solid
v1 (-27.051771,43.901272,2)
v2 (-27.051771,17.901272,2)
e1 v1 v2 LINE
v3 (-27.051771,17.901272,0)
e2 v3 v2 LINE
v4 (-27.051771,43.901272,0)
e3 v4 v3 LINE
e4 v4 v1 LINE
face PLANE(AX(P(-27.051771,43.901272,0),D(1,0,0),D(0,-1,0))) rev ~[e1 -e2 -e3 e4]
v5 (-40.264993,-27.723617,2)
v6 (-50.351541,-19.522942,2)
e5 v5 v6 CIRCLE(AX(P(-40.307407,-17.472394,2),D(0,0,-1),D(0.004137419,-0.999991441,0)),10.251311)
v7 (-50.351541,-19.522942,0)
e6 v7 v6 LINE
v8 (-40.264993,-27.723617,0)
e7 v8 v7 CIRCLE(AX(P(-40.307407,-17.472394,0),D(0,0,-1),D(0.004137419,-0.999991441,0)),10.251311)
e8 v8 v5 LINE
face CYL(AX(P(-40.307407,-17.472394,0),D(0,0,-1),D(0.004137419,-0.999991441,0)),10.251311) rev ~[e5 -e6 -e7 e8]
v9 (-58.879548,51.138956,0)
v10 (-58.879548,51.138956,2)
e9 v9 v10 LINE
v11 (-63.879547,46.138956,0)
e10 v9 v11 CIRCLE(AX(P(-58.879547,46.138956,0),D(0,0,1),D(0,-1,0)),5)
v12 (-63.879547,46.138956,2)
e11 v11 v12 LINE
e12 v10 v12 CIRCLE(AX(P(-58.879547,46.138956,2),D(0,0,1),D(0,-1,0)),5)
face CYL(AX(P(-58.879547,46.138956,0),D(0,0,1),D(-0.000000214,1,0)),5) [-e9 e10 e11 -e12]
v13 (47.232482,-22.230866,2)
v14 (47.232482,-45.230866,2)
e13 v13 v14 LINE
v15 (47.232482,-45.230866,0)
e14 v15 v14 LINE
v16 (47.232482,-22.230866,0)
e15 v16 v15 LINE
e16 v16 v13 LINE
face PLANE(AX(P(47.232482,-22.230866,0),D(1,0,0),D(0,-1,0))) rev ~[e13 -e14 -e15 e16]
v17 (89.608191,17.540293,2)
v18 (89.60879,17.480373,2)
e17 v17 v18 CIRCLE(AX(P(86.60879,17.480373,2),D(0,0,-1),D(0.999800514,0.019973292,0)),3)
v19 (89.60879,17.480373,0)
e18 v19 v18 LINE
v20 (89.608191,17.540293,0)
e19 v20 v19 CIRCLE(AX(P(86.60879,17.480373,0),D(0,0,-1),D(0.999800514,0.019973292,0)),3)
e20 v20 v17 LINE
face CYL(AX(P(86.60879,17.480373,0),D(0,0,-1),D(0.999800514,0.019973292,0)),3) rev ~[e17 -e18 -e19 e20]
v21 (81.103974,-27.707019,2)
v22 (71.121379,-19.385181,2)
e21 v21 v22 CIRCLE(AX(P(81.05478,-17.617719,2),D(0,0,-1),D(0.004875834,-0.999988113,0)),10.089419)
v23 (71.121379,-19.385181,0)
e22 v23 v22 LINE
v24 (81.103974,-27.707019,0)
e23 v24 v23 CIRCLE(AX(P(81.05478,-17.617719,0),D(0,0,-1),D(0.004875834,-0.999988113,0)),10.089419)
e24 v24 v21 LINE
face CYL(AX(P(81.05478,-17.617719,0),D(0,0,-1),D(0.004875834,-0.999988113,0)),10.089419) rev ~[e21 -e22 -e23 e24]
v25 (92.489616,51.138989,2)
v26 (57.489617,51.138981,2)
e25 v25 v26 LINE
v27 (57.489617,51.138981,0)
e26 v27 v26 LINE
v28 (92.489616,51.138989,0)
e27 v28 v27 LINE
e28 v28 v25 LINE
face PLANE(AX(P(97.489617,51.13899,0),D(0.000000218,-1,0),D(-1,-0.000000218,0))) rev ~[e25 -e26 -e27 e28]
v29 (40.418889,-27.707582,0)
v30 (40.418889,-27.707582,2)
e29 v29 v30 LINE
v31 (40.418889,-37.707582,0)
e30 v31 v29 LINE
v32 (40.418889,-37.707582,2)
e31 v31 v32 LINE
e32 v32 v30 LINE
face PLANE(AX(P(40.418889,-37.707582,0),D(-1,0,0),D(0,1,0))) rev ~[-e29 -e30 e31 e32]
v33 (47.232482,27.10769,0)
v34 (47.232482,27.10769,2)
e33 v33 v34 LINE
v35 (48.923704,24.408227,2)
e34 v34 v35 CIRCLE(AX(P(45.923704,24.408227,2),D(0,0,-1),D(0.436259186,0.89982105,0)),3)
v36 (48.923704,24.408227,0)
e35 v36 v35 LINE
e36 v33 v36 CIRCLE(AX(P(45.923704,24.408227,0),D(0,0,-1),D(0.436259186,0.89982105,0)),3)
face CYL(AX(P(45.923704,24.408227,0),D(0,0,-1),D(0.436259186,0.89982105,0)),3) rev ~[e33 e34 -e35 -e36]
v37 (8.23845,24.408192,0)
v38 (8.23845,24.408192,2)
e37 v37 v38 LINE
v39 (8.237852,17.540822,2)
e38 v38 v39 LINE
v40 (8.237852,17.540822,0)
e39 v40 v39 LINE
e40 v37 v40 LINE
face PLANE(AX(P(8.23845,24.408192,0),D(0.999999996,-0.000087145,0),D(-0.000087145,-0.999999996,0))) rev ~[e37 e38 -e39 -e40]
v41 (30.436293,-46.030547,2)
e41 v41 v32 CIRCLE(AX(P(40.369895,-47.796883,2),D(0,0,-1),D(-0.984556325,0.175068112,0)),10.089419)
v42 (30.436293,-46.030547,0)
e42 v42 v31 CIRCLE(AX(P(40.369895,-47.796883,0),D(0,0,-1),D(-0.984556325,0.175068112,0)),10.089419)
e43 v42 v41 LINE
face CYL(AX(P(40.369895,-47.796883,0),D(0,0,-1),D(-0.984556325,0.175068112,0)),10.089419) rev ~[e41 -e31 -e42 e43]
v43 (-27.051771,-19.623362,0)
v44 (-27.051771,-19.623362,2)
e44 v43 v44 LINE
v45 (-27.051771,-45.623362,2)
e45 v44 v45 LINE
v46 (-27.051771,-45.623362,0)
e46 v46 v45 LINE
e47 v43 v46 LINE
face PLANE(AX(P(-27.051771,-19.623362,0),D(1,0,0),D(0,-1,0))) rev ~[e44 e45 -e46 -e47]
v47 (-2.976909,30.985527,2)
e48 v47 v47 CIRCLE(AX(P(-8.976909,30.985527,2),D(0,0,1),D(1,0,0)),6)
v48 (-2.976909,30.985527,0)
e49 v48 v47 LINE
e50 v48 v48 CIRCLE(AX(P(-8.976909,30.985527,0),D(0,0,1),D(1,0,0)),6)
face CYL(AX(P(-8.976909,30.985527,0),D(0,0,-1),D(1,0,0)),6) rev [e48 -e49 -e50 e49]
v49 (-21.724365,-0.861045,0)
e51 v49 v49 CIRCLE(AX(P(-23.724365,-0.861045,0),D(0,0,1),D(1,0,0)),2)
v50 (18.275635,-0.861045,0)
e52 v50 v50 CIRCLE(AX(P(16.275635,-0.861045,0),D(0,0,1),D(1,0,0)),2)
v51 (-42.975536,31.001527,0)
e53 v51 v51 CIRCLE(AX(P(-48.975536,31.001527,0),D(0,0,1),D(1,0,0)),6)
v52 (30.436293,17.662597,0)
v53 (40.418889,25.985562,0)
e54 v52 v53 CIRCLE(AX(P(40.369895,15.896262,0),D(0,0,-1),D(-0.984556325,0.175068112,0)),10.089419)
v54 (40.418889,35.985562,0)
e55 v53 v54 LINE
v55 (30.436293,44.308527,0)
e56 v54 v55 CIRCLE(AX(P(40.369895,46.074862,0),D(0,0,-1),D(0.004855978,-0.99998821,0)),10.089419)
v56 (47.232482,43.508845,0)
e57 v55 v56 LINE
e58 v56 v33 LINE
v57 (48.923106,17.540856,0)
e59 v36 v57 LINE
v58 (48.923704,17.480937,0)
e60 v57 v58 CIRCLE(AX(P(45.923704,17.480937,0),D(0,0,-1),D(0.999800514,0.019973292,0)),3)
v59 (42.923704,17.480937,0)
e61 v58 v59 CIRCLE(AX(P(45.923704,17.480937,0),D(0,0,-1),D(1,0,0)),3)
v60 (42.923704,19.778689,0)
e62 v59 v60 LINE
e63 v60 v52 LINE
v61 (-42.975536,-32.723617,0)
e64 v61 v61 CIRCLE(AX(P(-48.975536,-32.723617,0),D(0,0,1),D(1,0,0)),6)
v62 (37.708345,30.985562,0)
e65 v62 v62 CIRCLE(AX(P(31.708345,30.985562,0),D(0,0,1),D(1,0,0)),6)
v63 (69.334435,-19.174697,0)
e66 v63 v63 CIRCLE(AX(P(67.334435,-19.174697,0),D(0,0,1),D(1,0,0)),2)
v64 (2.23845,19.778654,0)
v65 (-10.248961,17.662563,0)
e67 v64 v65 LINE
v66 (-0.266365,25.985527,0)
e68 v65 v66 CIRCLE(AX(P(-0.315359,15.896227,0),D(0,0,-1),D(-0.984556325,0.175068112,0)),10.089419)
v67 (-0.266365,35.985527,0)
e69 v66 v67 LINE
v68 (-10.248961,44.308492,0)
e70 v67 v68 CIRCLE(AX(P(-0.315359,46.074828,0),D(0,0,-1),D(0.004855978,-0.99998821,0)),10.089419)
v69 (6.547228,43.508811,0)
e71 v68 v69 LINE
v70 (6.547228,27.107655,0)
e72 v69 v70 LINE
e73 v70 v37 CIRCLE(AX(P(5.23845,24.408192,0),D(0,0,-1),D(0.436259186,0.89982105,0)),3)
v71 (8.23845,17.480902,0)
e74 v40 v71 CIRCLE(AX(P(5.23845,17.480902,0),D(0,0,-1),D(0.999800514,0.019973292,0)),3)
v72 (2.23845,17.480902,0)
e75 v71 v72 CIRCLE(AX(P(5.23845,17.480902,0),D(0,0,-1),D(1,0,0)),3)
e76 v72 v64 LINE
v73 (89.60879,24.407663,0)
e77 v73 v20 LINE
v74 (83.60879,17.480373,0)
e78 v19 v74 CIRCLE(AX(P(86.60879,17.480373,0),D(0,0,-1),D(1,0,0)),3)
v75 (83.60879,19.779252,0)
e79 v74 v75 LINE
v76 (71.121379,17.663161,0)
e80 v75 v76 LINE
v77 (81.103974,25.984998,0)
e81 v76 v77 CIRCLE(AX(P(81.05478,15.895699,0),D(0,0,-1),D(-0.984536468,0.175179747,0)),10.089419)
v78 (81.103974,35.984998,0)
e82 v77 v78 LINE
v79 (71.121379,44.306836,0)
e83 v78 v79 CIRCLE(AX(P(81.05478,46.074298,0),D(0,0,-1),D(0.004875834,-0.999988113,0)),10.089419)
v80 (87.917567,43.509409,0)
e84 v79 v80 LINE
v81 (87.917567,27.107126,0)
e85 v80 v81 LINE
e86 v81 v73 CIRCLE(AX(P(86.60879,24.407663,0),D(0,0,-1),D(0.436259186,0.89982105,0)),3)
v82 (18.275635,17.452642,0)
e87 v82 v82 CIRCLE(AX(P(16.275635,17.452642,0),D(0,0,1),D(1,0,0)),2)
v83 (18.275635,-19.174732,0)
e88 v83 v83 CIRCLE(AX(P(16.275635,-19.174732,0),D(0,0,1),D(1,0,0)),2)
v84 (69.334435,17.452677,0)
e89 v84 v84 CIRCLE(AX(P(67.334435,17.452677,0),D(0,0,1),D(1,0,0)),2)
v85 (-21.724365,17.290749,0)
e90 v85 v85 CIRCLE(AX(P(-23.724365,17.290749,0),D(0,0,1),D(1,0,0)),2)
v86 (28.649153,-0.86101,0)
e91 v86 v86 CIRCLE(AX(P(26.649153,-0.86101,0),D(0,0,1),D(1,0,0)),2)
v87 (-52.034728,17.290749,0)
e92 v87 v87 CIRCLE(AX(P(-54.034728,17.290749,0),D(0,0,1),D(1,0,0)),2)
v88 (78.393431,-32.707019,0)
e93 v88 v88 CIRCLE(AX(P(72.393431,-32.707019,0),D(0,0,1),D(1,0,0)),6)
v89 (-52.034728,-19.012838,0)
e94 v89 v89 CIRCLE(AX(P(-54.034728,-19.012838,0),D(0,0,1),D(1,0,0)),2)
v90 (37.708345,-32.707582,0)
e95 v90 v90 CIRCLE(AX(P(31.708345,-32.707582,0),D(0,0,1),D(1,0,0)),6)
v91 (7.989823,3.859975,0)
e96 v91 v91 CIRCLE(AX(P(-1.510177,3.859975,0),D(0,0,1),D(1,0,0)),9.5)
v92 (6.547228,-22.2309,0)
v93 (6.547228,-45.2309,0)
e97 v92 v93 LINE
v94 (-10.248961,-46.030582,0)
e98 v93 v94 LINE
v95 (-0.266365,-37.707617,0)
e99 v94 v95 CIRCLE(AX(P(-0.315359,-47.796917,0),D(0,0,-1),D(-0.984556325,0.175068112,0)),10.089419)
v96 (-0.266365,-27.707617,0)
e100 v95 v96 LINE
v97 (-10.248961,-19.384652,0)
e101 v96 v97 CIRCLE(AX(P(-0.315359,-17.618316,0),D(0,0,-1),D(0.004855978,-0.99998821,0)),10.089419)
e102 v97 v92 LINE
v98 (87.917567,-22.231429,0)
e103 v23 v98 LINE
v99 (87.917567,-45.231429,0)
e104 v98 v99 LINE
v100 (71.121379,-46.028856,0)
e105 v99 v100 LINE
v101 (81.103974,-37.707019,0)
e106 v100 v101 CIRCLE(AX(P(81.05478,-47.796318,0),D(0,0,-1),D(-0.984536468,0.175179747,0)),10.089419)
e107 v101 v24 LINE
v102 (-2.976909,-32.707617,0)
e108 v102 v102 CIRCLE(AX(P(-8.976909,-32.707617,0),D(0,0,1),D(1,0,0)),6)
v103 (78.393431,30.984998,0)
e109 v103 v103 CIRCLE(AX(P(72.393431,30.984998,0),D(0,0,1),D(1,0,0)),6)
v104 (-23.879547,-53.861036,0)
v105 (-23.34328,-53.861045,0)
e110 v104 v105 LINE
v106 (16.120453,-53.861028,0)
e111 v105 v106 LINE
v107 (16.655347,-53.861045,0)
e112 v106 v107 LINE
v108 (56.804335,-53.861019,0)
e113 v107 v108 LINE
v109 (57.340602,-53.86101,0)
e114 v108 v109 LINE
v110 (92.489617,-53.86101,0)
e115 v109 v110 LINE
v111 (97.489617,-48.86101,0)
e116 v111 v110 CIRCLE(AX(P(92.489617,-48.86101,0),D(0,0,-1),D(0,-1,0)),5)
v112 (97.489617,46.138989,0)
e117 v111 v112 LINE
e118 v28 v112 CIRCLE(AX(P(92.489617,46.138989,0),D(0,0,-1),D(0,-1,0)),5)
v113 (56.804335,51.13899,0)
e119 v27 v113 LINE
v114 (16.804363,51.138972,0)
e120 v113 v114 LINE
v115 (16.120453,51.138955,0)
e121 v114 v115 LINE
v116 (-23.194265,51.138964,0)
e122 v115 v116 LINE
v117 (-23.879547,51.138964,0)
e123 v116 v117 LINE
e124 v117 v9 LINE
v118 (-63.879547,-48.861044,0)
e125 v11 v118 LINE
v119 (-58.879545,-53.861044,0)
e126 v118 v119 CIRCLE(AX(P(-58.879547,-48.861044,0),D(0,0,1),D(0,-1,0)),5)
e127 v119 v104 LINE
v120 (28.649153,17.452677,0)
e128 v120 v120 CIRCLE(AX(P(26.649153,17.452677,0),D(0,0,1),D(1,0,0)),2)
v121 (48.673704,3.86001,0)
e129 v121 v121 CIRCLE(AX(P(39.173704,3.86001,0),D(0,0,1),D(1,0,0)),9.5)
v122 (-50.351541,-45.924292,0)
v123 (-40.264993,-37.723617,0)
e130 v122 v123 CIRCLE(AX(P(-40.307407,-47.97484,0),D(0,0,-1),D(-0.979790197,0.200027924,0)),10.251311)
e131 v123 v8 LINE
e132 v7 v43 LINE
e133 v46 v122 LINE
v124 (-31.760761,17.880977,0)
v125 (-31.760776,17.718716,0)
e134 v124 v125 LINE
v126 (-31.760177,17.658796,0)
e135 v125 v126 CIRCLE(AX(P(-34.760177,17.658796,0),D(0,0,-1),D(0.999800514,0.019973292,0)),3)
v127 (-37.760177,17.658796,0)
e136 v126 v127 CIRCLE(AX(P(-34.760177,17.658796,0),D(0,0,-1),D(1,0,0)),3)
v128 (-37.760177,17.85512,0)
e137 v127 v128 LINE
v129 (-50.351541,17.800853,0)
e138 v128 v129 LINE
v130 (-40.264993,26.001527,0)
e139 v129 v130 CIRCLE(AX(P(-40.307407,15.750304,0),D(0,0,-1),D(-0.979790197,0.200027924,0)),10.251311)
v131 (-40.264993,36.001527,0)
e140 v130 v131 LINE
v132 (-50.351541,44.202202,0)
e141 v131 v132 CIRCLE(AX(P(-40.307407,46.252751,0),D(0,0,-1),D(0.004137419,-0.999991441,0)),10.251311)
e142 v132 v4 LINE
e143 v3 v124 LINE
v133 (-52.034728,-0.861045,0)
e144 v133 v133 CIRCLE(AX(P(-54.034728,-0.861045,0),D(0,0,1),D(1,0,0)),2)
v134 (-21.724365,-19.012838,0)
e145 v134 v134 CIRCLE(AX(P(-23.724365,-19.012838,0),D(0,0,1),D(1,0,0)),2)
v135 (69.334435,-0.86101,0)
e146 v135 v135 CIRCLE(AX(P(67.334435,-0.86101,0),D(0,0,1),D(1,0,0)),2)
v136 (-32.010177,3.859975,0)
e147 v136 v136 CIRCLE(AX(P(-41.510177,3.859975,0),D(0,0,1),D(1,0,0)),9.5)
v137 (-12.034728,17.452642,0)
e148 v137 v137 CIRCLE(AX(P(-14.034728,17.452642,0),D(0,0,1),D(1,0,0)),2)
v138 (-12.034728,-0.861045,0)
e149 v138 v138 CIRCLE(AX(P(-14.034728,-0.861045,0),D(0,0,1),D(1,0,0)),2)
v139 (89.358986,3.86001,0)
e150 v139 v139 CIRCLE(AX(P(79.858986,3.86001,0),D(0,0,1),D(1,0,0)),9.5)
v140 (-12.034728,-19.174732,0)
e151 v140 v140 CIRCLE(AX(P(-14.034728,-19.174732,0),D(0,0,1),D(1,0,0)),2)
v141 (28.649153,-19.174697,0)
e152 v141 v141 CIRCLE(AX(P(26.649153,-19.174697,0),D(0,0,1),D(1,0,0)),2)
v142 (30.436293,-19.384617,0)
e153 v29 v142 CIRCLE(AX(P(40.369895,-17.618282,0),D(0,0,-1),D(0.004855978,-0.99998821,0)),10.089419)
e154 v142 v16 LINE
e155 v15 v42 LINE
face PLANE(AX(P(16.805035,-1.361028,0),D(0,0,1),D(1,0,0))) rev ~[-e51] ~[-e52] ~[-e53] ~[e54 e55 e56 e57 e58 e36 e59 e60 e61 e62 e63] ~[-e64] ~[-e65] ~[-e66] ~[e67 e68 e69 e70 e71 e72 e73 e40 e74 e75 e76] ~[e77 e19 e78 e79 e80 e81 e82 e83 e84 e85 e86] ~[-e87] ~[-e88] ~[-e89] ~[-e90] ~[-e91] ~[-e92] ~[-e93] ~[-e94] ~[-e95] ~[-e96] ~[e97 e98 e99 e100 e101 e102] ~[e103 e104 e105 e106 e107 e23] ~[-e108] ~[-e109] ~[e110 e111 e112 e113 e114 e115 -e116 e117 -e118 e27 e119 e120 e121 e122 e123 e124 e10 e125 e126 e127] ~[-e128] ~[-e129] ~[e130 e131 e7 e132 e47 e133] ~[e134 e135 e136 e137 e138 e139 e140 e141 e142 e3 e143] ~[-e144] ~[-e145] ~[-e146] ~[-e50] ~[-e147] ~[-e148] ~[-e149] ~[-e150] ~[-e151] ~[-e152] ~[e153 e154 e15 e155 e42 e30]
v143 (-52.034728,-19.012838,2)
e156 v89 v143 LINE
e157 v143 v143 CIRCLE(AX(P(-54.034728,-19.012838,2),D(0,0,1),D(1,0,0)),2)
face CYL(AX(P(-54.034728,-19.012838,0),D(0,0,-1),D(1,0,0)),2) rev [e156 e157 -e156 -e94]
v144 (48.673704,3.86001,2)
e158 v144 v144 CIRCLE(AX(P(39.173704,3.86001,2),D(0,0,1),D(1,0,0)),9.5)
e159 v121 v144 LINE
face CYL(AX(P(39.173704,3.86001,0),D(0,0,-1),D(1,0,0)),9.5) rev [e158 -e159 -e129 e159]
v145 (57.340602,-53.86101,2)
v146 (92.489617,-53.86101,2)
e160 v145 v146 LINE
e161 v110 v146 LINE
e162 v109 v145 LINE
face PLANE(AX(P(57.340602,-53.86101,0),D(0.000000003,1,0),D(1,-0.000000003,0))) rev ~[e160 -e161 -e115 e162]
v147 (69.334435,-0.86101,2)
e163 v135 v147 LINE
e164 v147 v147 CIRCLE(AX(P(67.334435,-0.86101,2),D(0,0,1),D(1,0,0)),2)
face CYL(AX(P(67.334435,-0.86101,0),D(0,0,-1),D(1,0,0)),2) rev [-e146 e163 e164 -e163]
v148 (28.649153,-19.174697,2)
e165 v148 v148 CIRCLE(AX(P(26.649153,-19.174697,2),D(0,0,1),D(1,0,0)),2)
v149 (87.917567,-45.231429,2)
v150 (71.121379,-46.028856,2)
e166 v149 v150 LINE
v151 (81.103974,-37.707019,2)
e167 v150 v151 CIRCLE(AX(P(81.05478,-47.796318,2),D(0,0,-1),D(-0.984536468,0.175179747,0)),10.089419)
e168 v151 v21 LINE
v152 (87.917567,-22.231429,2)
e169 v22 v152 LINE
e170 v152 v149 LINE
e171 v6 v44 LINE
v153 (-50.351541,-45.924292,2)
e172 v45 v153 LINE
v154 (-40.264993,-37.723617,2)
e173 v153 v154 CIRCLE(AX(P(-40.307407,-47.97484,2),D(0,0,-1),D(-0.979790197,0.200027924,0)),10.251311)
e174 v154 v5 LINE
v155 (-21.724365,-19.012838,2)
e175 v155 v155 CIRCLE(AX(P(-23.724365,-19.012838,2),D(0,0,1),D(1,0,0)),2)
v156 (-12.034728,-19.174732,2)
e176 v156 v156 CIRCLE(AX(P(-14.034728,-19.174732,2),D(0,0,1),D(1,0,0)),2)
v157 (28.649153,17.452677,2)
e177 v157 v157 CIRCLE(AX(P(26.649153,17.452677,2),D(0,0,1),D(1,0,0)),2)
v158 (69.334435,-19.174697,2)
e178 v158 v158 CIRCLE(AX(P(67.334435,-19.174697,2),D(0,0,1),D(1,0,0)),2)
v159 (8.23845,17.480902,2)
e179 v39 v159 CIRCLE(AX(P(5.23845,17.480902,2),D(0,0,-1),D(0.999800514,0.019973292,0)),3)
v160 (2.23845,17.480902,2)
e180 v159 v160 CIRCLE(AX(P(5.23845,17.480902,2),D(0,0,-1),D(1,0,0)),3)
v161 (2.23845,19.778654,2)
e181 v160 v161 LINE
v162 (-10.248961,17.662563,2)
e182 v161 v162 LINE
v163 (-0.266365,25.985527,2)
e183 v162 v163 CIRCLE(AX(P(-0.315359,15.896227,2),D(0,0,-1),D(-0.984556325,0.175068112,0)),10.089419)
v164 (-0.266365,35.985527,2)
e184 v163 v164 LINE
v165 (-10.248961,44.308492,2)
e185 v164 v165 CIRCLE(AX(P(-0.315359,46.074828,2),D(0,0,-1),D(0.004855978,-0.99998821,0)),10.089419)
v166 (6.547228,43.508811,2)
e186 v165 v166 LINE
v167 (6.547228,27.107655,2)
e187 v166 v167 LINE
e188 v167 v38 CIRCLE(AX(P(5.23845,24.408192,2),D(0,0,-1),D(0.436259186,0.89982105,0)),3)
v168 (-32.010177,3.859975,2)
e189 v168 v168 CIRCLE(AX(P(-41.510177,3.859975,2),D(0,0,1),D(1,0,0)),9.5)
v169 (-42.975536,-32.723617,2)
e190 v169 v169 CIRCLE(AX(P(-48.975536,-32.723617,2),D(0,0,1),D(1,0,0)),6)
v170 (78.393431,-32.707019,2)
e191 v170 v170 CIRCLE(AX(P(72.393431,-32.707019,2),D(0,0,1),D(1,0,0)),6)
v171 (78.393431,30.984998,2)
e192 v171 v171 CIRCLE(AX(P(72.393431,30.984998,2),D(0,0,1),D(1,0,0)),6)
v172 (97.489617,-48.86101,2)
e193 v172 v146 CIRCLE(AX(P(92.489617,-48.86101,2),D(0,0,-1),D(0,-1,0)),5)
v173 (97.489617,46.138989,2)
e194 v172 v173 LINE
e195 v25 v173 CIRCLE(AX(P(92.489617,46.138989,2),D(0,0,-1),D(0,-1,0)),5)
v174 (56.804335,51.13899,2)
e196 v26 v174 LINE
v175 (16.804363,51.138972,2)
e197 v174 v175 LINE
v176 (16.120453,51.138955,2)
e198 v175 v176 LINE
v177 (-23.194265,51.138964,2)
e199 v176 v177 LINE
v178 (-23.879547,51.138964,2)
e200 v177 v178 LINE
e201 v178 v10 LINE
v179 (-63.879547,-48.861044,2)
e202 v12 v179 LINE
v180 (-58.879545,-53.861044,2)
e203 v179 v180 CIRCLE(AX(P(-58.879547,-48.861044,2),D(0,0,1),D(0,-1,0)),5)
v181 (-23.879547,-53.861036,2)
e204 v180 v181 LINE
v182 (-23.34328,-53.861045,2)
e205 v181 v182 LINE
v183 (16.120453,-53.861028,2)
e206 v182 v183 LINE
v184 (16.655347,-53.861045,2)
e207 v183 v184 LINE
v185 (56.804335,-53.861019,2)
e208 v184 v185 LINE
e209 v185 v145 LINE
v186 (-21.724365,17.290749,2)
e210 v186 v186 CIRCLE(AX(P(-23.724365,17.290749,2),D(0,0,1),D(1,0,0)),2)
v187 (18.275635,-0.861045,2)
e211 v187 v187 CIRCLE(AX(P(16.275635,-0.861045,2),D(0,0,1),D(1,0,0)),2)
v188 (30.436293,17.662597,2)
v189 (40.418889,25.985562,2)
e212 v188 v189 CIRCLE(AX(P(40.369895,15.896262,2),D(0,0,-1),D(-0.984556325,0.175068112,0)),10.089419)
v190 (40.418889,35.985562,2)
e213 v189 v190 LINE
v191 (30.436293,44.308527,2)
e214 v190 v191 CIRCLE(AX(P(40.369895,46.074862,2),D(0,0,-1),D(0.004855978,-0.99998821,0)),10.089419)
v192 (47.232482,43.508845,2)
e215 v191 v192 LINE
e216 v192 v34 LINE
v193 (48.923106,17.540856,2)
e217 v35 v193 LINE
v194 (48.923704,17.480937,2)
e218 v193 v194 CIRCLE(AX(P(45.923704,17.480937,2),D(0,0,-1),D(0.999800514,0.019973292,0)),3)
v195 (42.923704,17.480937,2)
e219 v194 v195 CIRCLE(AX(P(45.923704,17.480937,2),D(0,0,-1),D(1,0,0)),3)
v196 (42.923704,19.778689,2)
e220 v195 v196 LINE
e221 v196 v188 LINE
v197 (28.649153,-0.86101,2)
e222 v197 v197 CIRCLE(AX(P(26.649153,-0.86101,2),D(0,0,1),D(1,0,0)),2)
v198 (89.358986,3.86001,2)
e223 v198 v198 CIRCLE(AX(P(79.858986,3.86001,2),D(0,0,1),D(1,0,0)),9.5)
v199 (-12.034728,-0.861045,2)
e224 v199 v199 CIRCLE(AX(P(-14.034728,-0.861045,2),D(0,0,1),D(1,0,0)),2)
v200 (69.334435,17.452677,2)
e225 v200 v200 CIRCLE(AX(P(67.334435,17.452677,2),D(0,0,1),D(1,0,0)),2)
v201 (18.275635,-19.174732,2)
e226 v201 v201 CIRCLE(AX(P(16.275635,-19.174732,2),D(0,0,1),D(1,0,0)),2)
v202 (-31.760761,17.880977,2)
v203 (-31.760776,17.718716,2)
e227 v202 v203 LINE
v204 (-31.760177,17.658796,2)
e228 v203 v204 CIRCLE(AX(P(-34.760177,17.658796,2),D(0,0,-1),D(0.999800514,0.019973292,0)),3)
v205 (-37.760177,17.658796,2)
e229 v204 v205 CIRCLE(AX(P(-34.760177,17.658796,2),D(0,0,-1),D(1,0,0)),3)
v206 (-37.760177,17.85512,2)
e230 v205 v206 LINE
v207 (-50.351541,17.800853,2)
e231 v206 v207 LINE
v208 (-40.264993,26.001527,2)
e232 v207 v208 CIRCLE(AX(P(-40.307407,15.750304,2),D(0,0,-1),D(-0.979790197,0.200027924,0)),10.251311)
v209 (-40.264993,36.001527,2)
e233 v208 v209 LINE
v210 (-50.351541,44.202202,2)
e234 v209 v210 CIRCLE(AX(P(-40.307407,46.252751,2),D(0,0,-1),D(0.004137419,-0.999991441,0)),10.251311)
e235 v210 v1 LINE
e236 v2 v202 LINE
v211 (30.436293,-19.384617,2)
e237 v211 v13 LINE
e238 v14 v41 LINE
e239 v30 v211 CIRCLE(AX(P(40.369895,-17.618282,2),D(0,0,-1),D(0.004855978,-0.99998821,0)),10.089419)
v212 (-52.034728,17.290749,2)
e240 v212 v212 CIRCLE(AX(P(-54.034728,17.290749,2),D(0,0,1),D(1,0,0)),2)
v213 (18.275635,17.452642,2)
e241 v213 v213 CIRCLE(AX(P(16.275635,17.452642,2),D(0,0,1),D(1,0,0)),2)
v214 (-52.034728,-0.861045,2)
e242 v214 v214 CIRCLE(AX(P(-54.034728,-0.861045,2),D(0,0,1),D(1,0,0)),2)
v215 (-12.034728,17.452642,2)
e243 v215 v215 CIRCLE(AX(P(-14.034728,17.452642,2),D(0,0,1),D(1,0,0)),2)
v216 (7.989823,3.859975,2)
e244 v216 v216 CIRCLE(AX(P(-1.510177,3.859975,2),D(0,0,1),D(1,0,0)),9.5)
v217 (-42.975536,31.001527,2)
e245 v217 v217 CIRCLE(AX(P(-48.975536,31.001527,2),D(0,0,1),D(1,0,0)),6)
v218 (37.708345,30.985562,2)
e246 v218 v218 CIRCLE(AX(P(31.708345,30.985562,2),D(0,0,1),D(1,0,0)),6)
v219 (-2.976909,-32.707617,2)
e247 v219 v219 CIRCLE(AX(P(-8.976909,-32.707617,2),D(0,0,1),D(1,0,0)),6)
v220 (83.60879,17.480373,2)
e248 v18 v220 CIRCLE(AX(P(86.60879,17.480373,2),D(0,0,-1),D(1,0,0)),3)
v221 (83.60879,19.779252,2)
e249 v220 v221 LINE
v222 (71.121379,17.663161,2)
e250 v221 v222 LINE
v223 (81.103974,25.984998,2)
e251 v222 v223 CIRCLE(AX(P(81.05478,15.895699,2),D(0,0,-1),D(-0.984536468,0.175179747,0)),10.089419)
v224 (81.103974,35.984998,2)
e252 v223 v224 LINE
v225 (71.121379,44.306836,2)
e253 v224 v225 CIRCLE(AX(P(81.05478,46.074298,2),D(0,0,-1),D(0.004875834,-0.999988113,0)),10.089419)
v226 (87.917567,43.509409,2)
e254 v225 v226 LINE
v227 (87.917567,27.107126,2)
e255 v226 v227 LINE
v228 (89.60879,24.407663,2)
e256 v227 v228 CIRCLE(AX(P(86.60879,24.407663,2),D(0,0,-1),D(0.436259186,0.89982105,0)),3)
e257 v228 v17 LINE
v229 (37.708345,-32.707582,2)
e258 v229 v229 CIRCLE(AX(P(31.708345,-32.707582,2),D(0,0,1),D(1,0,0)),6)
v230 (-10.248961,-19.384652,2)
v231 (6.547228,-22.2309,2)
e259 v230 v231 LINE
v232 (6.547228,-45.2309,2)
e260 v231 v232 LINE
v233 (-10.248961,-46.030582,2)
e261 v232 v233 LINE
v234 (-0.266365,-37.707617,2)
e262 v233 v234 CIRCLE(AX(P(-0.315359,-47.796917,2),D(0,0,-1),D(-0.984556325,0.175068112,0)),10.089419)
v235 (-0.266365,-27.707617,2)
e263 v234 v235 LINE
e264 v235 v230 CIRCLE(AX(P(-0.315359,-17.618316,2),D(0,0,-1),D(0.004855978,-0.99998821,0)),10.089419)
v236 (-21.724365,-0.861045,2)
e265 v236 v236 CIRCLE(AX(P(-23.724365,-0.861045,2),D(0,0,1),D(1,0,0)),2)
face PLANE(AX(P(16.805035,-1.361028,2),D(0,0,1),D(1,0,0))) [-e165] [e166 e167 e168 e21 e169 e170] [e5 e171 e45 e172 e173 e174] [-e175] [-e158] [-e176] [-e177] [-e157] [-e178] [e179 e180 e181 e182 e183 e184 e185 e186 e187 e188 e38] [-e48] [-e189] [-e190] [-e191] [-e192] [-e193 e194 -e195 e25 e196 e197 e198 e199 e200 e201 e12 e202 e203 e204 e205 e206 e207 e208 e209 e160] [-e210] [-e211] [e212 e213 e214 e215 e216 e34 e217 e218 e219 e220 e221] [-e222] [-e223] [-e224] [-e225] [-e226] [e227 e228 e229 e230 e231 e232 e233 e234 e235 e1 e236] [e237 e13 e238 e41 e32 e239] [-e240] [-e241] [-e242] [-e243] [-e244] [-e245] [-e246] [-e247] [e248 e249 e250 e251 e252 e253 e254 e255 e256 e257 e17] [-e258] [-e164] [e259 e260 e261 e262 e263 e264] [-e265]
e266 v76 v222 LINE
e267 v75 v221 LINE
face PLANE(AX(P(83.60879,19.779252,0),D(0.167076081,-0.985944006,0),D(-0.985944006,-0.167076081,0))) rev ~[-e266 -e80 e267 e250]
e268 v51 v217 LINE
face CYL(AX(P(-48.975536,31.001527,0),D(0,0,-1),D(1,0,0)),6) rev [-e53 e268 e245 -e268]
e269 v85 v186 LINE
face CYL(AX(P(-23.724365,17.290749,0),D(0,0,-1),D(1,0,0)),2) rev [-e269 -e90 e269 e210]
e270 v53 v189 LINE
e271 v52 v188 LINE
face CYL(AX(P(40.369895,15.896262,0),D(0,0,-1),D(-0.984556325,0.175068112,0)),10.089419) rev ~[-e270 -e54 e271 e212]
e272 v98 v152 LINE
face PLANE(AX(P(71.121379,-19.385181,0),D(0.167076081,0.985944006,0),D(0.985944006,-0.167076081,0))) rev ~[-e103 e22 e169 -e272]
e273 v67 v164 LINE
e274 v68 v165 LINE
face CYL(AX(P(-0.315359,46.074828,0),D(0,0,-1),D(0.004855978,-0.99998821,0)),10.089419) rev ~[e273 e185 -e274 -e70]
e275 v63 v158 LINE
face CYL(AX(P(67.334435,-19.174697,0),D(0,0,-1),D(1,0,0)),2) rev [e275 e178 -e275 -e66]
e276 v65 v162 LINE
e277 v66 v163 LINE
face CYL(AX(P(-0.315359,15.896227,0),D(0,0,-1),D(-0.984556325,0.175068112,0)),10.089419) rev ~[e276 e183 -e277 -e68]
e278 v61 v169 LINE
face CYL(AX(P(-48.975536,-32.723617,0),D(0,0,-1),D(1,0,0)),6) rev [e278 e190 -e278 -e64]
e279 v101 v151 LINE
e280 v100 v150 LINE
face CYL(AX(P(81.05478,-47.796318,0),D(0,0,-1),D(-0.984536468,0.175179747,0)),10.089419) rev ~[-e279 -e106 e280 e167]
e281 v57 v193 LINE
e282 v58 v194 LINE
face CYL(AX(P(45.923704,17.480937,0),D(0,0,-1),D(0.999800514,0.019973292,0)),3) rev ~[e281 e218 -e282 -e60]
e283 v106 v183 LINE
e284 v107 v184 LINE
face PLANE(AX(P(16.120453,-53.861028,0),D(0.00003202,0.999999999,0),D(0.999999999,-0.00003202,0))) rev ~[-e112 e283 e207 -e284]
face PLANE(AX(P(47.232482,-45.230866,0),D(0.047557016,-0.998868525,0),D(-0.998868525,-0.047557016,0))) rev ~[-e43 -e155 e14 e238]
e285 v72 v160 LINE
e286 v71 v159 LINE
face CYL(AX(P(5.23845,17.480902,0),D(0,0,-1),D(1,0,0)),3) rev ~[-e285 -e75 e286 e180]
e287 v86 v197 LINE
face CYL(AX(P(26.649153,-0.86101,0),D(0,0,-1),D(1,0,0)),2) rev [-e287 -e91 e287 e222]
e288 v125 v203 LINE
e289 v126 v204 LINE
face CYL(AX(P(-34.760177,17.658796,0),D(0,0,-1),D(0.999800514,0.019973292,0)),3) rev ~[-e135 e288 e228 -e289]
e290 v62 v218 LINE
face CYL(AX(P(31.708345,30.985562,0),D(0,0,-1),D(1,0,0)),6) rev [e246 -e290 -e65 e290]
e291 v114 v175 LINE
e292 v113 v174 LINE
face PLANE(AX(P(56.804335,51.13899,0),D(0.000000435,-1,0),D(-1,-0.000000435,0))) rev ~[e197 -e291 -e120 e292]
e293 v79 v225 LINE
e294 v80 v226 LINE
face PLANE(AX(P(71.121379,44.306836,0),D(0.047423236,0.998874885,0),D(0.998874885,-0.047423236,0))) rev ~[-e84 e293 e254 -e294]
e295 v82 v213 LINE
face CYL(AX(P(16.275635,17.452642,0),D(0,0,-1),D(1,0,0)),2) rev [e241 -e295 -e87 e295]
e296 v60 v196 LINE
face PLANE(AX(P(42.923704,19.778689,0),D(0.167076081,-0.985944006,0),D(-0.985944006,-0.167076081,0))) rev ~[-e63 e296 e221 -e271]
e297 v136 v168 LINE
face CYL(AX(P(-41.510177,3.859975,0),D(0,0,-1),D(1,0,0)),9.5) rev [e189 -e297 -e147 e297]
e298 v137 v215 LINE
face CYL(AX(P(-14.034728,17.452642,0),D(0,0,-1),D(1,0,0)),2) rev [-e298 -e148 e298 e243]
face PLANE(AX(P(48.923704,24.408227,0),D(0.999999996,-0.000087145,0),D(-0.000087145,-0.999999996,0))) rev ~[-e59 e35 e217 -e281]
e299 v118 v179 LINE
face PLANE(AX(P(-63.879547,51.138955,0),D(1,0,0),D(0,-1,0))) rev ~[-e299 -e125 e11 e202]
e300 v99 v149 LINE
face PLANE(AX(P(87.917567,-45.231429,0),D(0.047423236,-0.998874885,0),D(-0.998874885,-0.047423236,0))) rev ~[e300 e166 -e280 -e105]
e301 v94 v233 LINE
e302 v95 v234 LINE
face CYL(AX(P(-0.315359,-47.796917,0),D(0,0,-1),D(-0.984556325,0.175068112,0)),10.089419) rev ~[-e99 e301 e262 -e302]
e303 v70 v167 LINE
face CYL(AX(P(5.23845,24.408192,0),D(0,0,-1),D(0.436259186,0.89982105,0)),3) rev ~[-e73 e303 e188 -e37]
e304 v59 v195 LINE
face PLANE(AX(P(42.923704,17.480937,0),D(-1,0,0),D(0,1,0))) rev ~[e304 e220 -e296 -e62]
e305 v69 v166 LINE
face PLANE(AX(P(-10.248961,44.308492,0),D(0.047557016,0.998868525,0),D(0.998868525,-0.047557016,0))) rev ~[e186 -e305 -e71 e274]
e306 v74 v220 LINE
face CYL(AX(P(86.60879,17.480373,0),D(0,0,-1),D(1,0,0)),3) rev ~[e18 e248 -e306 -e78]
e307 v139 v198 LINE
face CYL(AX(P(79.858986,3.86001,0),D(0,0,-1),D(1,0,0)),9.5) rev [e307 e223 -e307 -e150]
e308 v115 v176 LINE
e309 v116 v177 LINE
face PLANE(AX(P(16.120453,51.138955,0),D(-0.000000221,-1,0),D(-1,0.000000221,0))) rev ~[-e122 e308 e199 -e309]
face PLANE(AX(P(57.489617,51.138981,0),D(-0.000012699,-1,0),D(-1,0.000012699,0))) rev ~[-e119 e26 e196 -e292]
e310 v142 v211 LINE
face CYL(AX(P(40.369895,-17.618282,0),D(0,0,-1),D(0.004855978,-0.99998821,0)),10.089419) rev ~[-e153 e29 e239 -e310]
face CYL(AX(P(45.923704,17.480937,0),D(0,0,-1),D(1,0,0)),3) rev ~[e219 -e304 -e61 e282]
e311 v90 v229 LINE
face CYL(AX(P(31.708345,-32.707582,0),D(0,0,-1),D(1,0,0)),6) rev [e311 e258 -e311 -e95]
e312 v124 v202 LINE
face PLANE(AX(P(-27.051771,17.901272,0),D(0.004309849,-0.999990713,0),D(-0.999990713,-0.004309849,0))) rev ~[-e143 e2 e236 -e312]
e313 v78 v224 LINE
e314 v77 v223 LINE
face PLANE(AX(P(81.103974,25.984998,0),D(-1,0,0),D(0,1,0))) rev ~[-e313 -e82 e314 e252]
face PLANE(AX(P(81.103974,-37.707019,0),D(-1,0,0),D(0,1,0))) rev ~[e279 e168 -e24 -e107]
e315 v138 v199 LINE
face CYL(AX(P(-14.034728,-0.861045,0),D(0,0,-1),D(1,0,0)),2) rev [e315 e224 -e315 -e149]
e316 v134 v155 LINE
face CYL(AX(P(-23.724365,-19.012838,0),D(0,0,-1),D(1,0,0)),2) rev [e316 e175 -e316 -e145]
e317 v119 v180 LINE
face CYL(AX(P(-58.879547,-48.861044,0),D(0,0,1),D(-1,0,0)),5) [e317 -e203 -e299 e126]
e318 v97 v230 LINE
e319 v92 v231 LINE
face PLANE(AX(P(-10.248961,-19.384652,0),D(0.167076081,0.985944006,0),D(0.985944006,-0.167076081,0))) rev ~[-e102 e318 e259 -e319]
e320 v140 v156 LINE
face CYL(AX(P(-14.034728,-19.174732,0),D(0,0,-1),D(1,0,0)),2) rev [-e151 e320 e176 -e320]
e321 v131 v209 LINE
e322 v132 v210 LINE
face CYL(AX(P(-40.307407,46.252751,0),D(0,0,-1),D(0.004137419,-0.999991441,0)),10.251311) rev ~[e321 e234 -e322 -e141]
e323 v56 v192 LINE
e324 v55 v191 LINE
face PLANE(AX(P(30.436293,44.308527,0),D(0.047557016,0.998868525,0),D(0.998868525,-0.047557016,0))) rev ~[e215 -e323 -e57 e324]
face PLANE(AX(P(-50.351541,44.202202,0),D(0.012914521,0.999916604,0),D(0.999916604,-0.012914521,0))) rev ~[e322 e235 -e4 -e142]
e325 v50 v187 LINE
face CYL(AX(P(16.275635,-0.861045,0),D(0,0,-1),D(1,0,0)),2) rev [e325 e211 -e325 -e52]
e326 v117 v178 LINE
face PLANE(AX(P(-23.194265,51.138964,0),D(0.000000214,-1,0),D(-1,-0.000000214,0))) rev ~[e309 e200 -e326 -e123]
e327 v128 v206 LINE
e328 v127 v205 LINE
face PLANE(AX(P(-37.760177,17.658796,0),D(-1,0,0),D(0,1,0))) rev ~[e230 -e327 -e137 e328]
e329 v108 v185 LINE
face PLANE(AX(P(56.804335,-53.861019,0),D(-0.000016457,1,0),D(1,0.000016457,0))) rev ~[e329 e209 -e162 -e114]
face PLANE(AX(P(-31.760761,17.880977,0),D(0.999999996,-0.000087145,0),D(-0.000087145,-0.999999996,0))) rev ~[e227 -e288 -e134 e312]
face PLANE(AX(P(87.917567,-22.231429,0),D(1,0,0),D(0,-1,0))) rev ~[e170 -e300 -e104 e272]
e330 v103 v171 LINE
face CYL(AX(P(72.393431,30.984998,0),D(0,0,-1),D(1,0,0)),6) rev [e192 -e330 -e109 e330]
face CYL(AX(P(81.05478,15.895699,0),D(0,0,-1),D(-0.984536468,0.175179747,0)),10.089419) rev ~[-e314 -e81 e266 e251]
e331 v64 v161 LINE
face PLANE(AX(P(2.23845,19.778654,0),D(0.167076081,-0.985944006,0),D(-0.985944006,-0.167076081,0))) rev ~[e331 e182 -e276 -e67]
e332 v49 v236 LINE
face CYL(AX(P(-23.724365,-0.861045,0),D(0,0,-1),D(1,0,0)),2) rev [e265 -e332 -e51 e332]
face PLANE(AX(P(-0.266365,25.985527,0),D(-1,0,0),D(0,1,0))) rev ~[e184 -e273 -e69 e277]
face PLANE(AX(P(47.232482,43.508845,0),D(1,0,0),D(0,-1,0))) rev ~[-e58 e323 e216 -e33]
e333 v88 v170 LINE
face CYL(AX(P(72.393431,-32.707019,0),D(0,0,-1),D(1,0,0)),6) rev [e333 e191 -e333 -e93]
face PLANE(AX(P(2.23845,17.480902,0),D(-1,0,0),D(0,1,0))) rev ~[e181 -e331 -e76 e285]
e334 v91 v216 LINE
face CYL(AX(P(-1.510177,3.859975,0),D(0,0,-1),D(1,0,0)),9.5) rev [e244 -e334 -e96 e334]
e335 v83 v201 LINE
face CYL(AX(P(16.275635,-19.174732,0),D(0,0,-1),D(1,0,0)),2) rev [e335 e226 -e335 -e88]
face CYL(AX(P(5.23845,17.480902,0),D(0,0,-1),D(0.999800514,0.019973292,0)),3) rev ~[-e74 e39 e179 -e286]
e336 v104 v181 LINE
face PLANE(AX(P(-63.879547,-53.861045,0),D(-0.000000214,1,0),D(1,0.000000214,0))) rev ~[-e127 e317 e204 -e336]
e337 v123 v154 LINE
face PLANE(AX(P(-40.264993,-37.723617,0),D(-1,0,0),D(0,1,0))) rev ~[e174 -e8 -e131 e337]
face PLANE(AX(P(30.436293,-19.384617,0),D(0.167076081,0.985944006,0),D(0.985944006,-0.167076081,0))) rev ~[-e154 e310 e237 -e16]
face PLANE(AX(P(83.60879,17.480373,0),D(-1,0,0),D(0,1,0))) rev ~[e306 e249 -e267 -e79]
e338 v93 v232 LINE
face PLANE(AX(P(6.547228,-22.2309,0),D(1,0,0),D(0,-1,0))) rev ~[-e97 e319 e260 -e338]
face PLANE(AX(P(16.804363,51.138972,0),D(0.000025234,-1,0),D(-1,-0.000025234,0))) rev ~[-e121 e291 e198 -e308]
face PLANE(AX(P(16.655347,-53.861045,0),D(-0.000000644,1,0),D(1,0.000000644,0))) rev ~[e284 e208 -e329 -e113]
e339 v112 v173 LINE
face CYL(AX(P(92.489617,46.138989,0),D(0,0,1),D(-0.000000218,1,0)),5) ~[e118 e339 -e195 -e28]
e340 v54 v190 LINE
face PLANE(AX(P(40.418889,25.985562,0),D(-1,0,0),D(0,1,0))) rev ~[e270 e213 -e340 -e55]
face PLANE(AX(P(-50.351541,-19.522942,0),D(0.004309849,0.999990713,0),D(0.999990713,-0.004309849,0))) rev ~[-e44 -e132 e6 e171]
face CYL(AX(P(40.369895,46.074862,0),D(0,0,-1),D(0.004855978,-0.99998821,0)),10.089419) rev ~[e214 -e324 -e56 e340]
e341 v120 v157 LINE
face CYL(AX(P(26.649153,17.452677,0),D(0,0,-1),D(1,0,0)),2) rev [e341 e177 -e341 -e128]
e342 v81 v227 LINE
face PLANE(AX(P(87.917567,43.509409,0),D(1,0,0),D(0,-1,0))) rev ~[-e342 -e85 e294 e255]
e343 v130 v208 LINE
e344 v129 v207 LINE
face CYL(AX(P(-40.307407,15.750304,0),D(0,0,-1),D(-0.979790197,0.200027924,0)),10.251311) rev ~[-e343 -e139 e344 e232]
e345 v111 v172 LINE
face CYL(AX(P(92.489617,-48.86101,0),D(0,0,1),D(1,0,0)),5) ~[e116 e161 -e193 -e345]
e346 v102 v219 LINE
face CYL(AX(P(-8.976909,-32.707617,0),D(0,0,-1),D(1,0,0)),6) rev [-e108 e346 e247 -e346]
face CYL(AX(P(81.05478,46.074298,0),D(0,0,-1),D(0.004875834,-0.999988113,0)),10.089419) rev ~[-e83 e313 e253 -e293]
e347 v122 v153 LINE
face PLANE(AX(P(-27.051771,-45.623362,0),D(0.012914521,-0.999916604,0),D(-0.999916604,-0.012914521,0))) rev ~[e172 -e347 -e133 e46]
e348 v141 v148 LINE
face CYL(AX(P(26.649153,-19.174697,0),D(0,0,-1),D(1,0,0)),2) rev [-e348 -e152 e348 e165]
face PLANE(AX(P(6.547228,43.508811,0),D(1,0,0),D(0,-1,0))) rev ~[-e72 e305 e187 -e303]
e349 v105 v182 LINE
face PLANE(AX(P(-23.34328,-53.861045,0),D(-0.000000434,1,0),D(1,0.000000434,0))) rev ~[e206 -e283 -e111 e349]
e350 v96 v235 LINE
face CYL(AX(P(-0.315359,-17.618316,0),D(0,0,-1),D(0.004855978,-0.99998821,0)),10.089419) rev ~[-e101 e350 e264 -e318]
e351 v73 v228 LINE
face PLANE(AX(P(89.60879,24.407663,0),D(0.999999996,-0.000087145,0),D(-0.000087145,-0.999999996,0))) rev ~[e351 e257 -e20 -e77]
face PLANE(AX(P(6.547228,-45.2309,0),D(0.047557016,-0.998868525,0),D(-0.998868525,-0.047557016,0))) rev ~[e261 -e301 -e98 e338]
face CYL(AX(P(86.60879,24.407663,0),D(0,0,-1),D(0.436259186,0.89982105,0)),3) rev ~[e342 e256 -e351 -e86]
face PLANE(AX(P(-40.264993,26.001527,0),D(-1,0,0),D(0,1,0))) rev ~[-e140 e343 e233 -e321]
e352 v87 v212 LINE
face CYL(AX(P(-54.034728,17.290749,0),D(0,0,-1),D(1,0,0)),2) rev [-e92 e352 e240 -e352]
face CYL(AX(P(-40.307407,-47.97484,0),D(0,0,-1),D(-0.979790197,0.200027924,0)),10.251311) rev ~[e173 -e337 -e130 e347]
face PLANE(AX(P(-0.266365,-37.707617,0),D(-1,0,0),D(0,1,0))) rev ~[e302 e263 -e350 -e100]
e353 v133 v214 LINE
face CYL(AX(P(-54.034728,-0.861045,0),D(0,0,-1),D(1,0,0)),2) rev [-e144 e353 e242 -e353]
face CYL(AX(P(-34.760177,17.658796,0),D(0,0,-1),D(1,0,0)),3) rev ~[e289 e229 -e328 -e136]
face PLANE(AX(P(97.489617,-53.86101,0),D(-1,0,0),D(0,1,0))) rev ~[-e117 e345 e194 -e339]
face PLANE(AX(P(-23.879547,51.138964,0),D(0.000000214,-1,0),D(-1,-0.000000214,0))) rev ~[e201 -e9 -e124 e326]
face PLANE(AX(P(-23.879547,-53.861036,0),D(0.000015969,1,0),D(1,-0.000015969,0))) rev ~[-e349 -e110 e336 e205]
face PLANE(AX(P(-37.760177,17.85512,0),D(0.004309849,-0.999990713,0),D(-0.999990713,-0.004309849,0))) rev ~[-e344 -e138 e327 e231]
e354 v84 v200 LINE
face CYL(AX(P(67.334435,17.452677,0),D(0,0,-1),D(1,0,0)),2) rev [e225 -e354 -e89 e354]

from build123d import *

# Parameters (mm, degrees)
F0_R     = 6
F0_R_2   = 2
F0_R_3   = 9.5
F1_DEPTH = 2
F2_R     = 5


# Not quite as in the source:
# - ends of sketch curves that miss each other by under 0.0002 mm in the source are joined


with BuildPart() as f1:
    # F0 (on Top) → F1 (new body)
    with BuildSketch(Plane.XY):
        Polygon((-23.8795465221, 51.1389637595), (-63.8795465221, 51.1389552037), (-63.8795465221, -53.8610447963), (-23.8795465221, -53.8610362327), (-23.3432798734, -53.8610447963), (16.1204534779, -53.861027669), (16.6553473944, -53.8610447963), (56.8043348949, -53.8610189589), (57.3406015435, -53.8610101337), (97.4896168807, -53.8610102485), (97.4896168807, 51.1389898663), (57.4896168808, 51.1389811639), (56.8043348949, 51.1389898663), (16.8043627316, 51.1389724616), (16.1204534779, 51.1389552037), (-23.1942645362, 51.138963906), align=None)
        with Locations((-48.9755360277, -32.7236170491)):
            Circle(F0_R, mode=Mode.SUBTRACT)
        with BuildLine():
            ThreePointArc((-40.2649926355, -27.7236170491), (-46.7743509608, -25.4265127742), (-50.3515408057, -19.5229421029))
            Line((-50.3515408057, -19.5229421029), (-27.0517710596, -19.6233615279))
            Line((-27.0517710596, -19.6233615279), (-27.0517710596, -45.6233615279))
            Line((-27.0517710596, -45.6233615279), (-50.3515408057, -45.9242919952))
            ThreePointArc((-50.3515408057, -45.9242919952), (-46.7743509608, -40.020721324), (-40.2649926355, -37.7236170491))
            Line((-40.2649926355, -37.7236170491), (-40.2649926355, -27.7236170491))
        make_face(mode=Mode.SUBTRACT)
        with Locations((-8.9769087599, -32.7076169273)):
            Circle(F0_R, mode=Mode.SUBTRACT)
        with BuildLine():
            ThreePointArc((-0.2663653677, -27.7076169273), (-6.7763425011, -25.3676442405), (-10.2489610341, -19.3846520981))
            Line((-10.2489610341, -19.3846520981), (6.5472276519, -22.2309003302))
            Line((6.5472276519, -22.2309003302), (6.5472276519, -45.2309003302))
            Line((6.5472276519, -45.2309003302), (-10.2489610341, -46.0305817564))
            ThreePointArc((-10.2489610341, -46.0305817564), (-6.7763425011, -40.047589614), (-0.2663653677, -37.7076169273))
            Line((-0.2663653677, -37.7076169273), (-0.2663653677, -27.7076169273))
        make_face(mode=Mode.SUBTRACT)
        with Locations((-54.0347284068, -19.0128381198)):
            Circle(F0_R_2, mode=Mode.SUBTRACT)
        with Locations((-23.7243646373, -19.0128381198)):
            Circle(F0_R_2, mode=Mode.SUBTRACT)
        with Locations((-14.0347284068, -19.1747317856)):
            Circle(F0_R_2, mode=Mode.SUBTRACT)
        with Locations((16.2756353627, -19.1747317856)):
            Circle(F0_R_2, mode=Mode.SUBTRACT)
        with Locations((31.7083453892, -32.7075822646)):
            Circle(F0_R, mode=Mode.SUBTRACT)
        with BuildLine():
            ThreePointArc((40.4188887821, -27.7075822646), (33.9089116483, -25.3676095781), (30.436293115, -19.3846174354))
            Line((30.436293115, -19.3846174354), (47.2324818011, -22.2308656676))
            Line((47.2324818011, -22.2308656676), (47.2324818011, -45.2308656676))
            Line((47.2324818011, -45.2308656676), (30.436293115, -46.0305470938))
            ThreePointArc((30.436293115, -46.0305470938), (33.9089116483, -40.0475549511), (40.4188887821, -37.7075822646))
            Line((40.4188887821, -37.7075822646), (40.4188887821, -27.7075822646))
        make_face(mode=Mode.SUBTRACT)
        with Locations((72.393430969, -32.7070186107)):
            Circle(F0_R, mode=Mode.SUBTRACT)
        with BuildLine():
            ThreePointArc((81.1039743612, -27.7070186107), (74.5943131753, -25.3674773264), (71.1213786947, -19.3851810893))
            Line((71.1213786947, -19.3851810893), (87.9175673808, -22.2314293214))
            Line((87.9175673808, -22.2314293214), (87.9175673808, -45.2314293214))
            Line((87.9175673808, -45.2314293214), (71.1213786947, -46.0288561321))
            ThreePointArc((71.1213786947, -46.0288561321), (74.5943131753, -40.046559895), (81.1039743612, -37.7070186107))
            Line((81.1039743612, -37.7070186107), (81.1039743612, -27.7070186107))
        make_face(mode=Mode.SUBTRACT)
        with Locations((26.6491530101, -19.1746971229)):
            Circle(F0_R_2, mode=Mode.SUBTRACT)
        with Locations((67.334434996, -19.1746971229)):
            Circle(F0_R_2, mode=Mode.SUBTRACT)
        with Locations((-54.0347284068, -0.8610447963)):
            Circle(F0_R_2, mode=Mode.SUBTRACT)
        with Locations((-41.5101771743, 3.8599752962)):
            Circle(F0_R_3, mode=Mode.SUBTRACT)
        with Locations((-23.7243646373, -0.8610447963)):
            Circle(F0_R_2, mode=Mode.SUBTRACT)
        with Locations((-54.0347284068, 17.2907485271)):
            Circle(F0_R_2, mode=Mode.SUBTRACT)
        with Locations((-23.7243646373, 17.2907485271)):
            Circle(F0_R_2, mode=Mode.SUBTRACT)
        with Locations((-14.0347284068, -0.8610447963)):
            Circle(F0_R_2, mode=Mode.SUBTRACT)
        with Locations((-1.5101771743, 3.8599752962)):
            Circle(F0_R_3, mode=Mode.SUBTRACT)
        with Locations((16.2756353627, -0.8610447963)):
            Circle(F0_R_2, mode=Mode.SUBTRACT)
        with Locations((-14.0347284068, 17.4526421929)):
            Circle(F0_R_2, mode=Mode.SUBTRACT)
        with Locations((16.2756353627, 17.4526421929)):
            Circle(F0_R_2, mode=Mode.SUBTRACT)
        with Locations((-48.9755360277, 31.0015274564)):
            Circle(F0_R, mode=Mode.SUBTRACT)
        with BuildLine():
            ThreePointArc((-40.2649926355, 36.0015274564), (-46.7743509608, 38.2986317313), (-50.3515408057, 44.2022024026))
            Line((-50.3515408057, 44.2022024026), (-27.0517710596, 43.9012719352))
            Line((-27.0517710596, 43.9012719352), (-27.0517710596, 17.9012719352))
            Line((-27.0517710596, 17.9012719352), (-31.7607614923, 17.8809767084))
            Line((-31.7607614923, 17.8809767084), (-31.7607756326, 17.7187155905))
            ThreePointArc((-31.7607756326, 17.7187155905), (-31.7603267926, 17.6887571457), (-31.7601771743, 17.6587957124))
            ThreePointArc((-31.7601771743, 17.6587957124), (-34.7601771743, 14.6587957124), (-37.7601771743, 17.6587957124))
            Line((-37.7601771743, 17.6587957124), (-37.7601771743, 17.8551198918))
            Line((-37.7601771743, 17.8551198918), (-50.3515408057, 17.8008525103))
            ThreePointArc((-50.3515408057, 17.8008525103), (-46.7743509608, 23.7044231815), (-40.2649926355, 26.0015274564))
            Line((-40.2649926355, 26.0015274564), (-40.2649926355, 36.0015274564))
        make_face(mode=Mode.SUBTRACT)
        with Locations((-8.9769087599, 30.9855273346)):
            Circle(F0_R, mode=Mode.SUBTRACT)
        with BuildLine():
            ThreePointArc((-0.2663653677, 35.9855273346), (-6.7763425011, 38.3255000213), (-10.2489610341, 44.3084921637))
            Line((-10.2489610341, 44.3084921637), (6.5472276519, 43.5088107375))
            Line((6.5472276519, 43.5088107375), (6.5472276519, 27.1076551873))
            ThreePointArc((6.5472276519, 27.1076551873), (7.7807259121, 26.0009361033), (8.2384500935, 24.4081920365))
            Line((8.2384500935, 24.4081920365), (8.2378516352, 17.5408218029))
            ThreePointArc((8.2378516352, 17.5408218029), (8.2383004752, 17.5108633581), (8.2384500935, 17.4809019247))
            ThreePointArc((8.2384500935, 17.4809019247), (5.2384500935, 14.4809019247), (2.2384500935, 17.4809019247))
            Line((2.2384500935, 17.4809019247), (2.2384500935, 19.7786539896))
            Line((2.2384500935, 19.7786539896), (-10.2489610341, 17.6625625054))
            ThreePointArc((-10.2489610341, 17.6625625054), (-6.7763425011, 23.6455546479), (-0.2663653677, 25.9855273346))
            Line((-0.2663653677, 25.9855273346), (-0.2663653677, 35.9855273346))
        make_face(mode=Mode.SUBTRACT)
        with Locations((26.6491530101, -0.8610101337)):
            Circle(F0_R_2, mode=Mode.SUBTRACT)
        with Locations((39.1737042426, 3.8600099589)):
            Circle(F0_R_3, mode=Mode.SUBTRACT)
        with Locations((26.6491530101, 17.4526768556)):
            Circle(F0_R_2, mode=Mode.SUBTRACT)
        with Locations((67.334434996, -0.8610101337)):
            Circle(F0_R_2, mode=Mode.SUBTRACT)
        with Locations((79.8589862285, 3.8600099589)):
            Circle(F0_R_3, mode=Mode.SUBTRACT)
        with Locations((67.334434996, 17.4526768556)):
            Circle(F0_R_2, mode=Mode.SUBTRACT)
        with Locations((31.7083453892, 30.9855619972)):
            Circle(F0_R, mode=Mode.SUBTRACT)
        with BuildLine():
            ThreePointArc((40.4188887821, 35.9855619972), (33.9089116483, 38.3255346838), (30.436293115, 44.3085268264))
            Line((30.436293115, 44.3085268264), (47.2324818011, 43.5088454002))
            Line((47.2324818011, 43.5088454002), (47.2324818011, 27.10768985))
            ThreePointArc((47.2324818011, 27.10768985), (48.4659800612, 26.000970766), (48.9237042426, 24.4082266992))
            Line((48.9237042426, 24.4082266992), (48.9231057843, 17.5408564655))
            ThreePointArc((48.9231057843, 17.5408564655), (48.9235546243, 17.5108980207), (48.9237042426, 17.4809365874))
            ThreePointArc((48.9237042426, 17.4809365874), (45.9237042426, 14.4809365874), (42.9237042426, 17.4809365874))
            Line((42.9237042426, 17.4809365874), (42.9237042426, 19.7786886523))
            Line((42.9237042426, 19.7786886523), (30.436293115, 17.6625971681))
            ThreePointArc((30.436293115, 17.6625971681), (33.9089116483, 23.6455893107), (40.4188887821, 25.9855619972))
            Line((40.4188887821, 25.9855619972), (40.4188887821, 35.9855619972))
        make_face(mode=Mode.SUBTRACT)
        with Locations((72.393430969, 30.9849983434)):
            Circle(F0_R, mode=Mode.SUBTRACT)
        with BuildLine():
            ThreePointArc((81.1039743612, 35.9849983434), (74.5943131753, 38.3245396276), (71.1213786947, 44.3068358648))
            Line((71.1213786947, 44.3068358648), (87.9175673808, 43.5094090541))
            Line((87.9175673808, 43.5094090541), (87.9175673808, 27.1071261961))
            ThreePointArc((87.9175673808, 27.1071261961), (89.151065641, 26.0004071121), (89.6087898224, 24.4076630453))
            Line((89.6087898224, 24.4076630453), (89.6081913641, 17.5402928116))
            ThreePointArc((89.6081913641, 17.5402928116), (89.6086402041, 17.5103343668), (89.6087898224, 17.4803729335))
            ThreePointArc((89.6087898224, 17.4803729335), (86.6087898224, 14.4803729335), (83.6087898224, 17.4803729335))
            Line((83.6087898224, 17.4803729335), (83.6087898224, 19.7792523062))
            Line((83.6087898224, 19.7792523062), (71.1213786947, 17.663160822))
            ThreePointArc((71.1213786947, 17.663160822), (74.5943131753, 23.6454570591), (81.1039743612, 25.9849983434))
            Line((81.1039743612, 25.9849983434), (81.1039743612, 35.9849983434))
        make_face(mode=Mode.SUBTRACT)
    extrude(amount=F1_DEPTH)

    # F2
    f2_edges = [f1.edges().sort_by_distance(p)[0] for p in [
        (-63.879547, 51.138955, 1),
        (97.489617, 51.13899, 1),
        (-63.879547, -53.861045, 1),
        (97.489617, -53.86101, 1),
    ]]
    fillet(f2_edges, radius=F2_R)


solid = f1.part
